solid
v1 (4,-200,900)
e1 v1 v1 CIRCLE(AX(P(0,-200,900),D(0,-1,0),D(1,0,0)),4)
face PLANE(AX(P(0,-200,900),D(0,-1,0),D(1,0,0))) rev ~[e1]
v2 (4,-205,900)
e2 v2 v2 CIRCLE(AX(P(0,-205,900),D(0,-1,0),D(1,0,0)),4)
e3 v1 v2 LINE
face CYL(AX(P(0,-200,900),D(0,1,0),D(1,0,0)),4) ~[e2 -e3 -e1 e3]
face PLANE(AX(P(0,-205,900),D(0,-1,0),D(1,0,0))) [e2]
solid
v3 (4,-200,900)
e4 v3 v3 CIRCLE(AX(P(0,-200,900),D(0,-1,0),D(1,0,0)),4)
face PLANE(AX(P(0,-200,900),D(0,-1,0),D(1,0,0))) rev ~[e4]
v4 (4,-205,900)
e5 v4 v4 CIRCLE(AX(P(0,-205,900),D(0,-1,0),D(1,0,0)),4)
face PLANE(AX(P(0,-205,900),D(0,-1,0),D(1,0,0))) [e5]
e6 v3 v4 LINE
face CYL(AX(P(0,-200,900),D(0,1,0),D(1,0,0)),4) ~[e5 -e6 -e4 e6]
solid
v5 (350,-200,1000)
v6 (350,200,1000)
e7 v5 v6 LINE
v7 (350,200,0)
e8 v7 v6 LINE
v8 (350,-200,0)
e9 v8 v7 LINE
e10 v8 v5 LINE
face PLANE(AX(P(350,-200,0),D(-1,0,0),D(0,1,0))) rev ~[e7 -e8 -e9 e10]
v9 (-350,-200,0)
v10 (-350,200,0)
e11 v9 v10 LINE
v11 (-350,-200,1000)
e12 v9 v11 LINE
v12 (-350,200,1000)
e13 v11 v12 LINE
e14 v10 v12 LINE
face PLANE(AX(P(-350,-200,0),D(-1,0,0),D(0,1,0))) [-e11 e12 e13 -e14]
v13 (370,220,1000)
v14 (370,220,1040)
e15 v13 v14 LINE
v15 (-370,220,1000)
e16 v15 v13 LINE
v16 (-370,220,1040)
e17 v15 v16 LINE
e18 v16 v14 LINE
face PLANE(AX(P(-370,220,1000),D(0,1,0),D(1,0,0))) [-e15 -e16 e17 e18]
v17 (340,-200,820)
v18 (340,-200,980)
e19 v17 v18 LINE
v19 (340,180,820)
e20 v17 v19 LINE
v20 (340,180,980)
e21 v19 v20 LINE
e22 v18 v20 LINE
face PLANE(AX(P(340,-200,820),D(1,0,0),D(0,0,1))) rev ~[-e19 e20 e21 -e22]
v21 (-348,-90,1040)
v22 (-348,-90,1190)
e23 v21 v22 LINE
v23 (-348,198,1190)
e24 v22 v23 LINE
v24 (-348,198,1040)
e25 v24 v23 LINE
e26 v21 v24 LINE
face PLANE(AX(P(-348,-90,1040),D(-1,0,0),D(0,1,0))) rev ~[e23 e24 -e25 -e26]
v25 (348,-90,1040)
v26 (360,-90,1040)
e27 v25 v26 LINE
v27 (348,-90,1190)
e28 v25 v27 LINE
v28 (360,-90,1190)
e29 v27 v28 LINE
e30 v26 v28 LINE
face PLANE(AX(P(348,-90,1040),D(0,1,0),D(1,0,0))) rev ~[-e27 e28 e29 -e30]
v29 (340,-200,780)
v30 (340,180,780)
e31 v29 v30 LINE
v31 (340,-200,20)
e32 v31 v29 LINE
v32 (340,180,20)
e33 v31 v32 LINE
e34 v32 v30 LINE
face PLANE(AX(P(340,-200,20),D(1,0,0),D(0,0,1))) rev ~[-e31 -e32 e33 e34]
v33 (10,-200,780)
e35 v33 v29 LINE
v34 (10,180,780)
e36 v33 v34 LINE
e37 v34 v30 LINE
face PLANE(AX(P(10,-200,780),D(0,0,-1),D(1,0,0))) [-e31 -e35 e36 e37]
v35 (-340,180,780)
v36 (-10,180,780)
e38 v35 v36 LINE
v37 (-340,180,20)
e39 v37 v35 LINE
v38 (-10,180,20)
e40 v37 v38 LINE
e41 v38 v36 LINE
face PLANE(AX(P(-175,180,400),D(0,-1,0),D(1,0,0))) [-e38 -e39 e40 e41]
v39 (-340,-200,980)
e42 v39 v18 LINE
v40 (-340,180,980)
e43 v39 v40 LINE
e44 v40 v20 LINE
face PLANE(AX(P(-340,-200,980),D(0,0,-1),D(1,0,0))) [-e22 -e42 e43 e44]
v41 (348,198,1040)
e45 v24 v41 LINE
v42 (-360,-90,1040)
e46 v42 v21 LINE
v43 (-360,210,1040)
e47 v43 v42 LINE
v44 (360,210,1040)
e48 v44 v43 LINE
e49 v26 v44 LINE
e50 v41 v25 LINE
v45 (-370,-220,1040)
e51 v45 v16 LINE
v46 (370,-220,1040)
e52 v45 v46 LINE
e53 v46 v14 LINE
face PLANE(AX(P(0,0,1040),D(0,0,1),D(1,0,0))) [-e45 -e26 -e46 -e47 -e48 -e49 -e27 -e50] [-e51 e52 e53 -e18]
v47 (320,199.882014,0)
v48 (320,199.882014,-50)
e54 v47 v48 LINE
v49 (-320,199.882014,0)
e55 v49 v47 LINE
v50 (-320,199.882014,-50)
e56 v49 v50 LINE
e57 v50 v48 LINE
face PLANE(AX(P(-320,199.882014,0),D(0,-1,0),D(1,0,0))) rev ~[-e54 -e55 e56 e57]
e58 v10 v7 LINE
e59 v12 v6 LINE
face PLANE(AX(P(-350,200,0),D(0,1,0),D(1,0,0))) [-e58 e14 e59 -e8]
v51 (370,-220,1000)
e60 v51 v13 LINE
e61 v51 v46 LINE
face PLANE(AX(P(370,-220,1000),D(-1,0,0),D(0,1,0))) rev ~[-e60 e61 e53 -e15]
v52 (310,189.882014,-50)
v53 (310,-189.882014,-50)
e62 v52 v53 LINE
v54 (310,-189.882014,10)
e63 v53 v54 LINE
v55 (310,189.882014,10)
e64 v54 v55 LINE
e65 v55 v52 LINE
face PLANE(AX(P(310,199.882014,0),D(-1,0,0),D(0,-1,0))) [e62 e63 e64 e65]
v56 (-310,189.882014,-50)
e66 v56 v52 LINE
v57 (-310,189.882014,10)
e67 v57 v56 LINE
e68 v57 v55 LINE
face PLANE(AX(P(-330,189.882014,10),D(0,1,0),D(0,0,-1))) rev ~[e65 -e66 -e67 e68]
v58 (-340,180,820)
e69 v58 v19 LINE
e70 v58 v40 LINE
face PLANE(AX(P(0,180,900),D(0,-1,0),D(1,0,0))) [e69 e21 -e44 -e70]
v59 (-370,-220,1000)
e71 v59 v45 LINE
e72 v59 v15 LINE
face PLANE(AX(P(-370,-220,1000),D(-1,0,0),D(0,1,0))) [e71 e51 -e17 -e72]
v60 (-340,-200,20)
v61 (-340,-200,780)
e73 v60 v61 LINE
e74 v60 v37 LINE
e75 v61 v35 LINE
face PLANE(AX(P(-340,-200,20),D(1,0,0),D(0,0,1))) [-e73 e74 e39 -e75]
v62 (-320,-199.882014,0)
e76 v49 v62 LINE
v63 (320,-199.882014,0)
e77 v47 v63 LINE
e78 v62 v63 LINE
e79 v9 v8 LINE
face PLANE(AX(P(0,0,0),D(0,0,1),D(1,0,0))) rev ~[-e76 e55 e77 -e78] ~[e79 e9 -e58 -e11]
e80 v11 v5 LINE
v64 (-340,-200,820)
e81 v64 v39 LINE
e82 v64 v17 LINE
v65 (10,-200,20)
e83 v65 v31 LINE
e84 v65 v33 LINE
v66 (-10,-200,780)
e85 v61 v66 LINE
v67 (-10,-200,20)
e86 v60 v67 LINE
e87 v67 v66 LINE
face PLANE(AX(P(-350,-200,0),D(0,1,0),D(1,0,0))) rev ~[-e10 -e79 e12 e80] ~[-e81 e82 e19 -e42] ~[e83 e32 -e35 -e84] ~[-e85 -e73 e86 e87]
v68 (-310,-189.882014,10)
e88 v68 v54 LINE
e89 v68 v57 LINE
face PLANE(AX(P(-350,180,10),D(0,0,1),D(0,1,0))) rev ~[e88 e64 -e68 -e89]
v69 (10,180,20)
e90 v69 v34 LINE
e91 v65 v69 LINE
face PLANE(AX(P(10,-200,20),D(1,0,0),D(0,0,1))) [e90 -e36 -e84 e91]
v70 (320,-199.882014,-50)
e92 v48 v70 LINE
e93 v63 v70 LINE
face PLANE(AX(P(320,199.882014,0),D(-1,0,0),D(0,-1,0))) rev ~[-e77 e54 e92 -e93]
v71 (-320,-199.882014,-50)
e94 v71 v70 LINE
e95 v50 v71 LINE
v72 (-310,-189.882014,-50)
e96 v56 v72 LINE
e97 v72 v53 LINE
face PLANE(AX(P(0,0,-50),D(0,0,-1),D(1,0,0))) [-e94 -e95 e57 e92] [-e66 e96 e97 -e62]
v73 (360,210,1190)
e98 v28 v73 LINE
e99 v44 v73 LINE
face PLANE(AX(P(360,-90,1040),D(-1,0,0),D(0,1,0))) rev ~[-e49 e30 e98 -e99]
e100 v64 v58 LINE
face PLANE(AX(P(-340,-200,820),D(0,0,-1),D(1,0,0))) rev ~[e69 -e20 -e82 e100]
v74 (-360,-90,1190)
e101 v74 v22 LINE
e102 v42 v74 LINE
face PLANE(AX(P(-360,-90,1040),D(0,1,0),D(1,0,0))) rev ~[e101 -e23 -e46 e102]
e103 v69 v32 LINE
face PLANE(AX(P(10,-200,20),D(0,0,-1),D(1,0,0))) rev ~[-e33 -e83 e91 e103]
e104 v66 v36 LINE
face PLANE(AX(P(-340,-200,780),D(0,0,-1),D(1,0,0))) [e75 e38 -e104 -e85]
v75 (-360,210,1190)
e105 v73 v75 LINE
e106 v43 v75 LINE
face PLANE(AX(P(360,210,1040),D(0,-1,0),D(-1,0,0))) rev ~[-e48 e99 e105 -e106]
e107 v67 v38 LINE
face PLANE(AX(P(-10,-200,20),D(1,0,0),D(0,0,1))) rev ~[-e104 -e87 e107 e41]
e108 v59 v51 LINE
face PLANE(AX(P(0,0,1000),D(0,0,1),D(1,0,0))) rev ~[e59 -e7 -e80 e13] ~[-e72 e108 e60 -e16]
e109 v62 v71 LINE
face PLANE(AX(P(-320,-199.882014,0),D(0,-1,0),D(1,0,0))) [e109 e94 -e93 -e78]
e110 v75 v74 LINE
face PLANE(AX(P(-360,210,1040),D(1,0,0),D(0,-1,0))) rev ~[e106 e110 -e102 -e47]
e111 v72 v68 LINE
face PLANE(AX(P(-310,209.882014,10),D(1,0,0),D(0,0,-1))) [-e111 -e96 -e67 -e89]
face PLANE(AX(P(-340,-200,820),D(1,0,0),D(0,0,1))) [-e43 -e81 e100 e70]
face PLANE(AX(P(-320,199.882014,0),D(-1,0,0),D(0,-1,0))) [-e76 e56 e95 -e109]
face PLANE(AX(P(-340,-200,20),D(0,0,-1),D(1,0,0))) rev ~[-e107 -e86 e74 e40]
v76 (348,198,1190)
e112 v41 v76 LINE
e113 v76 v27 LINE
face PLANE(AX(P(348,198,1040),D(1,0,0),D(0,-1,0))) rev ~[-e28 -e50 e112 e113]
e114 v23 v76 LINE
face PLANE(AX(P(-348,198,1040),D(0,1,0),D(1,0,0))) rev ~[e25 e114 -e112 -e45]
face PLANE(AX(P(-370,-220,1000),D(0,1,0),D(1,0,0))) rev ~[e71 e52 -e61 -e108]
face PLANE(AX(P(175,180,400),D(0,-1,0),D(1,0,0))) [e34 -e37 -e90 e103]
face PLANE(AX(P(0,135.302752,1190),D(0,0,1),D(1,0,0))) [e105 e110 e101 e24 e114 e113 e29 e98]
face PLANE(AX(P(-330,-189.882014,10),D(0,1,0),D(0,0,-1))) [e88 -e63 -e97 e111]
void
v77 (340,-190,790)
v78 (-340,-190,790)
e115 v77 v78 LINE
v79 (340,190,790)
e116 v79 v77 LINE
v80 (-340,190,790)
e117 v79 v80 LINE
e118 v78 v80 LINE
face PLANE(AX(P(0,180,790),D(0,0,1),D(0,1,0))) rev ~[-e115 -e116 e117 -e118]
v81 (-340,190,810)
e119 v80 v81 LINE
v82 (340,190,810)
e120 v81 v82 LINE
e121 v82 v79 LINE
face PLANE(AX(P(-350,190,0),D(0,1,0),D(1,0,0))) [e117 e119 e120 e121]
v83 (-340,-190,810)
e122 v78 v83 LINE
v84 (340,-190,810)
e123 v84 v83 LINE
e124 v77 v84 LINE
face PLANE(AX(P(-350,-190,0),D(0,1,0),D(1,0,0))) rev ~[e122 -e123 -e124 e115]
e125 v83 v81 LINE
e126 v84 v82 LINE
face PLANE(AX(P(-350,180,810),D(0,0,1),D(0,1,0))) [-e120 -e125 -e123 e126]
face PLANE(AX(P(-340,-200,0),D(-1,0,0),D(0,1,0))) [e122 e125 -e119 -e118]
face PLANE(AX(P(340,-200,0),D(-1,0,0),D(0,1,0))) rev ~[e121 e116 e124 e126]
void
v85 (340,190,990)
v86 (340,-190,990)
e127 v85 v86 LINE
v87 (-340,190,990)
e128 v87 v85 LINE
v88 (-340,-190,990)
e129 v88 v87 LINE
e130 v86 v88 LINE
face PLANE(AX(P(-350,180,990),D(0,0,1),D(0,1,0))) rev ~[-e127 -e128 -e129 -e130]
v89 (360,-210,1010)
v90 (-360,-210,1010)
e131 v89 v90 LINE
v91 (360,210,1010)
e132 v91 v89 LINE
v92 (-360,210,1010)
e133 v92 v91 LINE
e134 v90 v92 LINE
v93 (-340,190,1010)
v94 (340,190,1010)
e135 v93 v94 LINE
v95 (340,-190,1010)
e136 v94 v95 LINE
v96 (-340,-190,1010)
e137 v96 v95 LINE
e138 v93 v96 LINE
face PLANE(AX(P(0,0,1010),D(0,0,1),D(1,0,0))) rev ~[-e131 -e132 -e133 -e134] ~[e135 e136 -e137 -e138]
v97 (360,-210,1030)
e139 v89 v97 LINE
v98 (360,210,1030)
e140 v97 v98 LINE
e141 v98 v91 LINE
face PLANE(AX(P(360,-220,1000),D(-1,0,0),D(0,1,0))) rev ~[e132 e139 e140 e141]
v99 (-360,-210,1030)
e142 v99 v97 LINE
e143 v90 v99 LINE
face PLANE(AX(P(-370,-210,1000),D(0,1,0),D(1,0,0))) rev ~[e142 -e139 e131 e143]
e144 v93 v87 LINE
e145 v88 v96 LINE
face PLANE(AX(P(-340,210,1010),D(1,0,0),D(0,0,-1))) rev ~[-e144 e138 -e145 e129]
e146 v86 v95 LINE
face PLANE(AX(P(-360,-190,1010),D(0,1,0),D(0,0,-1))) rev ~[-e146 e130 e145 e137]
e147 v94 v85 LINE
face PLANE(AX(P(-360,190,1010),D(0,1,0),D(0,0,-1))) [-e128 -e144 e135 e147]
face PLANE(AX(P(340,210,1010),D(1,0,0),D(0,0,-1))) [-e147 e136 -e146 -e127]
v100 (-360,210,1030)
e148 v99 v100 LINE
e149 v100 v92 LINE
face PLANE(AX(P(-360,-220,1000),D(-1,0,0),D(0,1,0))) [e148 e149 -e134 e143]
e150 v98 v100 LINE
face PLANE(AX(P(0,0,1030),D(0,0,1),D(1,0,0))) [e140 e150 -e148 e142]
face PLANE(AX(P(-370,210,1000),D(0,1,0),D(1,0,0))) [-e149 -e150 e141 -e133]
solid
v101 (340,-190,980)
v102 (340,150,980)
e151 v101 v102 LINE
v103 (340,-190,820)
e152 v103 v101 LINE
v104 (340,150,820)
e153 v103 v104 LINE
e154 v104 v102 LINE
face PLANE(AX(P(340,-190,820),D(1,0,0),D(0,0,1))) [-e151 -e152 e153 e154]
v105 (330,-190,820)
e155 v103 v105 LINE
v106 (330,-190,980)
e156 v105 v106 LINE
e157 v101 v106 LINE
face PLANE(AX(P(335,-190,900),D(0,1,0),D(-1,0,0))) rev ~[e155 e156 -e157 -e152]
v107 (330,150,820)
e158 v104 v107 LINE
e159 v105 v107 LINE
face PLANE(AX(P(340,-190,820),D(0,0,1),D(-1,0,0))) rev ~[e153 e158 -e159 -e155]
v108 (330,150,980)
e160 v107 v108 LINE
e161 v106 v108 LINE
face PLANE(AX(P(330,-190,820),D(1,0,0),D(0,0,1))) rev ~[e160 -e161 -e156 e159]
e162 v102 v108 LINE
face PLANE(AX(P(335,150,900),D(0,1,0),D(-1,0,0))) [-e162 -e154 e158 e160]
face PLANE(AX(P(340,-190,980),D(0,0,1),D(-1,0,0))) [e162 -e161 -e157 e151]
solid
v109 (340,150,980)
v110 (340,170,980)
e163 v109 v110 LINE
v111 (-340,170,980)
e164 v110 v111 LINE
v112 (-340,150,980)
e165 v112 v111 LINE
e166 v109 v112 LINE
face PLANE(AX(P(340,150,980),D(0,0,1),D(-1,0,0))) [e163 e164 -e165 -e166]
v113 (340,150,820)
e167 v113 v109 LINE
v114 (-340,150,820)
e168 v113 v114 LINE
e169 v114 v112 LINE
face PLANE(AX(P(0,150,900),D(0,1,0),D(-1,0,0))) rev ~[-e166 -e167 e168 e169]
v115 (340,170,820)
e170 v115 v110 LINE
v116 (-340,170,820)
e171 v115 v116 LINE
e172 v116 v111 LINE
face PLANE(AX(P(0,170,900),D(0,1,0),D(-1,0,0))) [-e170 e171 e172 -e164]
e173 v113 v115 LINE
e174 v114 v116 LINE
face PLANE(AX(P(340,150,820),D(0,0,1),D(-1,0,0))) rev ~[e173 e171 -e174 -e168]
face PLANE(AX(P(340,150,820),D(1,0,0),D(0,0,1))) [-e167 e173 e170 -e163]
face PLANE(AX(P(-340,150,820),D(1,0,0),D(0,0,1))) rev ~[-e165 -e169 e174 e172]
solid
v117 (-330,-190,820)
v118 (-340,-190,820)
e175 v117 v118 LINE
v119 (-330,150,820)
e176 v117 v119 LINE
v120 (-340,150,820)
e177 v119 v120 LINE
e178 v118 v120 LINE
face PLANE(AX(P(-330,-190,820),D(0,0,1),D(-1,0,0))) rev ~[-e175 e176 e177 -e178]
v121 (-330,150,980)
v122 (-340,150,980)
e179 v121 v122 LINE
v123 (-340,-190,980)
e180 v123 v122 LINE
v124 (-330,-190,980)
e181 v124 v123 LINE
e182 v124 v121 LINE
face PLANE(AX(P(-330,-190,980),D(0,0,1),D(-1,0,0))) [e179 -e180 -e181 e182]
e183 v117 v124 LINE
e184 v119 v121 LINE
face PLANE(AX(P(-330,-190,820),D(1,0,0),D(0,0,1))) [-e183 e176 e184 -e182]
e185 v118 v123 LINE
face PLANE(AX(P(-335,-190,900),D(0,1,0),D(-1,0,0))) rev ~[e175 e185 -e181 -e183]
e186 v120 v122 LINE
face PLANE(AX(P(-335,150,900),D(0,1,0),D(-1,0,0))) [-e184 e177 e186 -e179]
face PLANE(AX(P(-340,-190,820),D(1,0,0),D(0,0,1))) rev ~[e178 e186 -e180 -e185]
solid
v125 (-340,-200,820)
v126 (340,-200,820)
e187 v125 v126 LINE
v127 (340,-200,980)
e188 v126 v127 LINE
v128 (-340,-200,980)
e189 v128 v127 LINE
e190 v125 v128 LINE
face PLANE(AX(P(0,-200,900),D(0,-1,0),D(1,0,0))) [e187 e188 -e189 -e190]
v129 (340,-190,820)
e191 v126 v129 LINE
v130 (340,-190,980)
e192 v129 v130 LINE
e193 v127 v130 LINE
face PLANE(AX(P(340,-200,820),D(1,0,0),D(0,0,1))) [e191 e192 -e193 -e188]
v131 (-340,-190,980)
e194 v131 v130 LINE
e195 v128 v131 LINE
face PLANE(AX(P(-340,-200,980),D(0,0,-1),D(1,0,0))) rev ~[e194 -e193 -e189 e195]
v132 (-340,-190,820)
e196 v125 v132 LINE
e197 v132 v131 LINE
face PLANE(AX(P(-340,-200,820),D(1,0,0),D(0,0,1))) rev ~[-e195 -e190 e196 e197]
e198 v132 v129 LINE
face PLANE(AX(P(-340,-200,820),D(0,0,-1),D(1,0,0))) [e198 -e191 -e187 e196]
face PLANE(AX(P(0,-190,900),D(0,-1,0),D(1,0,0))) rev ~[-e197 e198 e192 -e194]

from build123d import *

# Parameters (mm, degrees)
F0_W          = 700
F0_H          = 400
F1_DEPTH      = 1000
F2_W          = 330
F2_H          = 760
F2_W_2        = 680
F2_H_2        = 160
F3_DEPTH      = 380
F4_W          = 680
F4_H          = 160
F5_DEPTH      = 10
F6_W          = 10
F6_H          = 160
F7_DEPTH      = 340
F8_W          = 680
F8_H          = 160
F9_DEPTH      = 20
F10_R         = 4
F11_DEPTH     = 5
F12_DEPTH     = 5
F13_W         = 740
F13_H         = 440
F14_DEPTH     = 40
F15_W         = 640
F15_H         = 399.7640275955
F16_DEPTH     = 50
F17_T         = 10
F17_T3_DEPTH  = 720
F17_T5_DEPTH  = 420
F17_T7_DEPTH  = 660
F17_T9_DEPTH  = 419.7640275955
F17_T11_DEPTH = 400
F17_T13_DEPTH = 700
F17_T15_DEPTH = 180
F17_T17_DEPTH = 350
F17_T19_DEPTH = 780
F17_T21_DEPTH = 350
F19_DEPTH     = 150


# Not quite as in the source:
# - a shell that OpenCascade refuses in one call is made with other operations: the cavity is built on its own and cut out


with BuildPart() as f1:
    # F0 (on Top) → F1 (new body)
    with BuildSketch(Plane.XY):
        Rectangle(F0_W, F0_H)
    extrude(amount=F1_DEPTH)

    # F2 (on face) → F3 (cut)
    with BuildSketch(Plane.XZ.offset(200)):
        with Locations((-175, 400)):
            Rectangle(F2_W, F2_H)
        with Locations((175, 400)):
            Rectangle(F2_W, F2_H)
        with Locations((0, 900)):
            Rectangle(F2_W_2, F2_H_2)
    extrude(amount=-F3_DEPTH, mode=Mode.SUBTRACT)

    # F13 (on face) → F14 (join)
    with BuildSketch(Plane.XY.offset(1000)):
        Rectangle(F13_W, F13_H)
    extrude(amount=F14_DEPTH)

    # F15 (on face) → F16 (join)
    with BuildSketch(Plane(origin=(0, 0, 0), x_dir=(1, 0, 0), z_dir=(0, 0, -1))):
        Rectangle(F15_W, F15_H)
    extrude(amount=F16_DEPTH)

    # F17: shell of thickness 10, made by hand


with BuildPart() as f5:
    # F4 (on face) → F5 (new body)
    with BuildSketch(Plane.XZ.offset(200)):
        with Locations((0, 900)):
            Rectangle(F4_W, F4_H)
    extrude(amount=-F5_DEPTH)


with BuildPart() as f7:
    # F6 (on face) → F7 (new body)
    with BuildSketch(Plane(origin=(0, -190, 0), x_dir=(-1, 0, 0), z_dir=(0, 1, 0))):
        with Locations((-335, 900)):
            Rectangle(F6_W, F6_H)
    extrude(amount=F7_DEPTH)


with BuildPart() as f7b:
    # F6 (on face) → F7, piece 2 (new body)
    with BuildSketch(Plane(origin=(0, -190, 0), x_dir=(-1, 0, 0), z_dir=(0, 1, 0))):
        with Locations((335, 900)):
            Rectangle(F6_W, F6_H)
    extrude(amount=F7_DEPTH)


with BuildPart() as f9:
    # F8 (on face) → F9 (new body)
    with BuildSketch(Plane(origin=(0, 150, 0), x_dir=(-1, 0, 0), z_dir=(0, 1, 0))):
        with Locations((0, 900)):
            Rectangle(F8_W, F8_H)
    extrude(amount=F9_DEPTH)


with BuildPart() as f11:
    # F10 (on face) → F11 (new body)
    with BuildSketch(Plane.XZ.offset(200)):
        with Locations((0, 900)):
            Circle(F10_R)
    extrude(amount=F11_DEPTH)


with BuildPart() as f12:
    # F10 (on face) → F12 (new body)
    with BuildSketch(Plane.XZ.offset(200)):
        with Locations((0, 900)):
            Circle(F10_R)
    extrude(amount=F12_DEPTH)


with BuildPart() as f17_core1:
    # F17_t2: copy of F1
    add(f1.part)

    # the walls: a layer under each face that stays
    f17_faces = [f17_core1.faces().sort_by_distance(p)[0] for p in [
        (0, -220, 1020),
        (-370, 0, 1020),
        (370, 0, 1020),
        (-345.3333333333, -205.3333333333, 1000),
        (0, 0, 1040),
        (0, 220, 1020),
        (0, -200, 500),
        (350, 0, 500),
        (0, 200, 500),
        (-350, 0, 500),
        (-326.6666666667, -186.6666666667, 0),
        (0, -10, 980),
        (340, -10, 900),
        (0, -10, 820),
        (-340, -10, 900),
        (-175, -10, 780),
        (-10, -10, 400),
        (-175, -10, 20),
        (-340, -10, 400),
        (175, -10, 20),
        (10, -10, 400),
        (175, -10, 780),
        (340, -10, 400),
        (0, -199.8820137978, -25),
        (320, 0, -25),
        (0, 199.8820137978, -25),
        (-320, 0, -25),
        (0, 180, 900),
        (-175, 180, 400),
        (175, 180, 400),
    ]]
    thicken(f17_faces, amount=-F17_T, mode=Mode.SUBTRACT)

    # F17_s4 → F17_t3 (cut)
    with BuildSketch(Plane.YZ.offset(-360)):
        Polygon((-200.1, 999.9), (-200, 1010), (-190, 1010), (-190, 1000), align=None)
        Polygon((200.1, 999.9), (200, 1010), (190, 1010), (190, 1000), align=None)
    extrude(amount=F17_T3_DEPTH, mode=Mode.SUBTRACT)

    # F17_s6 → F17_t5 (cut)
    with BuildSketch(Plane.XZ.offset(-210)):
        Polygon((350.1, 999.9), (350, 1010), (340, 1010), (340, 1000), align=None)
        Polygon((-350.1, 999.9), (-350, 1010), (-340, 1010), (-340, 1000), align=None)
    extrude(amount=F17_T5_DEPTH, mode=Mode.SUBTRACT)

    # F17_s8 → F17_t7 (cut)
    with BuildSketch(Plane.YZ.offset(-330)):
        Polygon((-199.9820137978, -0.1), (-199.8820137978, 10), (-189.8820137978, 10), (-189.8820137978, 0), align=None)
        Polygon((199.9820137978, -0.1), (199.8820137978, 10), (189.8820137978, 10), (189.8820137978, 0), align=None)
    extrude(amount=F17_T7_DEPTH, mode=Mode.SUBTRACT)

    # F17_s10 → F17_t9 (cut)
    with BuildSketch(Plane.XZ.offset(-209.8820137978)):
        Polygon((320.1, -0.1), (320, 10), (310, 10), (310, 0), align=None)
        Polygon((-320.1, -0.1), (-320, 10), (-310, 10), (-310, 0), align=None)
    extrude(amount=F17_T9_DEPTH, mode=Mode.SUBTRACT)

    # F17_s12 → F17_t11 (cut)
    with BuildSketch(Plane.XZ.offset(-190)):
        Polygon((339.9, 979.9), (340, 990), (350, 990), (350, 980), align=None)
        Polygon((-339.9, 979.9), (-340, 990), (-350, 990), (-350, 980), align=None)
        Polygon((339.9, 820.1), (350, 820), (350, 810), (340, 810), align=None)
        Polygon((-339.9, 820.1), (-340, 810), (-350, 810), (-350, 820), align=None)
        Polygon((-10.1, 779.9), (-10, 790), (0, 790), (0, 780), align=None)
        Polygon((-339.9, 779.9), (-340, 790), (-350, 790), (-350, 780), align=None)
        Polygon((-10.1, 20.1), (0, 20), (0, 10), (-10, 10), align=None)
        Polygon((-339.9, 20.1), (-340, 10), (-350, 10), (-350, 20), align=None)
        Polygon((10.1, 20.1), (10, 10), (0, 10), (0, 20), align=None)
        Polygon((339.9, 20.1), (340, 10), (350, 10), (350, 20), align=None)
        Polygon((10.1, 779.9), (0, 780), (0, 790), (10, 790), align=None)
        Polygon((339.9, 779.9), (340, 790), (350, 790), (350, 780), align=None)
    extrude(amount=F17_T11_DEPTH, mode=Mode.SUBTRACT)

    # F17_s14 → F17_t13 (cut)
    with BuildSketch(Plane.YZ.offset(-350)):
        Polygon((179.9, 979.9), (180, 990), (190, 990), (190, 980), align=None)
        Polygon((179.9, 820.1), (180, 810), (190, 810), (190, 820), align=None)
    extrude(amount=F17_T13_DEPTH, mode=Mode.SUBTRACT)

    # F17_s16 → F17_t15 (cut)
    with BuildSketch(Plane.XY.offset(810)):
        Polygon((339.9, 179.9), (350, 180), (350, 190), (340, 190), align=None)
        Polygon((-339.9, 179.9), (-350, 180), (-350, 190), (-340, 190), align=None)
    extrude(amount=F17_T15_DEPTH, mode=Mode.SUBTRACT)

    # F17_s18 → F17_t17 (cut)
    with BuildSketch(Plane.YZ.offset(-350)):
        Polygon((179.9, 779.9), (180, 790), (190, 790), (190, 780), align=None)
        Polygon((179.9, 20.1), (180, 10), (190, 10), (190, 20), align=None)
    extrude(amount=F17_T17_DEPTH, mode=Mode.SUBTRACT)

    # F17_s20 → F17_t19 (cut)
    with BuildSketch(Plane.XY.offset(10)):
        Polygon((-10.1, 179.9), (0, 180), (0, 190), (-10, 190), align=None)
        Polygon((-339.9, 179.9), (-350, 180), (-350, 190), (-340, 190), align=None)
        Polygon((10.1, 179.9), (0, 180), (0, 190), (10, 190), align=None)
        Polygon((339.9, 179.9), (350, 180), (350, 190), (340, 190), align=None)
    extrude(amount=F17_T19_DEPTH, mode=Mode.SUBTRACT)

    # F17_s22 → F17_t21 (cut)
    with BuildSketch(Plane.YZ):
        Polygon((179.9, 20.1), (180, 10), (190, 10), (190, 20), align=None)
        Polygon((179.9, 779.9), (180, 790), (190, 790), (190, 780), align=None)
    extrude(amount=F17_T21_DEPTH, mode=Mode.SUBTRACT)


with BuildPart() as f1_1:
    add(f1.part)

    # what is left inside the walls is the cavity
    f17_cavity = [f17_core1.part.solids().sort_by_distance(p)[0] for p in [
        (0, -70, 1029.9),
        (103.333333, 0, 9.9),
        (113.333333, 0, 809.9),
    ]]
    add(f17_cavity, mode=Mode.SUBTRACT)

    # F18 (on face) → F19 (join)
    with BuildSketch(Plane.XY.offset(1040)):
        Polygon((-348, 198), (348, 198), (348, -90), (360, -90), (360, 198), (360, 210), (348, 210), (-348, 210), (-360, 210), (-360, 198), (-360, -90), (-348, -90), align=None)
    extrude(amount=F19_DEPTH)


solid = Compound([f5.part, f7.part, f7b.part, f9.part, f11.part, f12.part, f1_1.part])
